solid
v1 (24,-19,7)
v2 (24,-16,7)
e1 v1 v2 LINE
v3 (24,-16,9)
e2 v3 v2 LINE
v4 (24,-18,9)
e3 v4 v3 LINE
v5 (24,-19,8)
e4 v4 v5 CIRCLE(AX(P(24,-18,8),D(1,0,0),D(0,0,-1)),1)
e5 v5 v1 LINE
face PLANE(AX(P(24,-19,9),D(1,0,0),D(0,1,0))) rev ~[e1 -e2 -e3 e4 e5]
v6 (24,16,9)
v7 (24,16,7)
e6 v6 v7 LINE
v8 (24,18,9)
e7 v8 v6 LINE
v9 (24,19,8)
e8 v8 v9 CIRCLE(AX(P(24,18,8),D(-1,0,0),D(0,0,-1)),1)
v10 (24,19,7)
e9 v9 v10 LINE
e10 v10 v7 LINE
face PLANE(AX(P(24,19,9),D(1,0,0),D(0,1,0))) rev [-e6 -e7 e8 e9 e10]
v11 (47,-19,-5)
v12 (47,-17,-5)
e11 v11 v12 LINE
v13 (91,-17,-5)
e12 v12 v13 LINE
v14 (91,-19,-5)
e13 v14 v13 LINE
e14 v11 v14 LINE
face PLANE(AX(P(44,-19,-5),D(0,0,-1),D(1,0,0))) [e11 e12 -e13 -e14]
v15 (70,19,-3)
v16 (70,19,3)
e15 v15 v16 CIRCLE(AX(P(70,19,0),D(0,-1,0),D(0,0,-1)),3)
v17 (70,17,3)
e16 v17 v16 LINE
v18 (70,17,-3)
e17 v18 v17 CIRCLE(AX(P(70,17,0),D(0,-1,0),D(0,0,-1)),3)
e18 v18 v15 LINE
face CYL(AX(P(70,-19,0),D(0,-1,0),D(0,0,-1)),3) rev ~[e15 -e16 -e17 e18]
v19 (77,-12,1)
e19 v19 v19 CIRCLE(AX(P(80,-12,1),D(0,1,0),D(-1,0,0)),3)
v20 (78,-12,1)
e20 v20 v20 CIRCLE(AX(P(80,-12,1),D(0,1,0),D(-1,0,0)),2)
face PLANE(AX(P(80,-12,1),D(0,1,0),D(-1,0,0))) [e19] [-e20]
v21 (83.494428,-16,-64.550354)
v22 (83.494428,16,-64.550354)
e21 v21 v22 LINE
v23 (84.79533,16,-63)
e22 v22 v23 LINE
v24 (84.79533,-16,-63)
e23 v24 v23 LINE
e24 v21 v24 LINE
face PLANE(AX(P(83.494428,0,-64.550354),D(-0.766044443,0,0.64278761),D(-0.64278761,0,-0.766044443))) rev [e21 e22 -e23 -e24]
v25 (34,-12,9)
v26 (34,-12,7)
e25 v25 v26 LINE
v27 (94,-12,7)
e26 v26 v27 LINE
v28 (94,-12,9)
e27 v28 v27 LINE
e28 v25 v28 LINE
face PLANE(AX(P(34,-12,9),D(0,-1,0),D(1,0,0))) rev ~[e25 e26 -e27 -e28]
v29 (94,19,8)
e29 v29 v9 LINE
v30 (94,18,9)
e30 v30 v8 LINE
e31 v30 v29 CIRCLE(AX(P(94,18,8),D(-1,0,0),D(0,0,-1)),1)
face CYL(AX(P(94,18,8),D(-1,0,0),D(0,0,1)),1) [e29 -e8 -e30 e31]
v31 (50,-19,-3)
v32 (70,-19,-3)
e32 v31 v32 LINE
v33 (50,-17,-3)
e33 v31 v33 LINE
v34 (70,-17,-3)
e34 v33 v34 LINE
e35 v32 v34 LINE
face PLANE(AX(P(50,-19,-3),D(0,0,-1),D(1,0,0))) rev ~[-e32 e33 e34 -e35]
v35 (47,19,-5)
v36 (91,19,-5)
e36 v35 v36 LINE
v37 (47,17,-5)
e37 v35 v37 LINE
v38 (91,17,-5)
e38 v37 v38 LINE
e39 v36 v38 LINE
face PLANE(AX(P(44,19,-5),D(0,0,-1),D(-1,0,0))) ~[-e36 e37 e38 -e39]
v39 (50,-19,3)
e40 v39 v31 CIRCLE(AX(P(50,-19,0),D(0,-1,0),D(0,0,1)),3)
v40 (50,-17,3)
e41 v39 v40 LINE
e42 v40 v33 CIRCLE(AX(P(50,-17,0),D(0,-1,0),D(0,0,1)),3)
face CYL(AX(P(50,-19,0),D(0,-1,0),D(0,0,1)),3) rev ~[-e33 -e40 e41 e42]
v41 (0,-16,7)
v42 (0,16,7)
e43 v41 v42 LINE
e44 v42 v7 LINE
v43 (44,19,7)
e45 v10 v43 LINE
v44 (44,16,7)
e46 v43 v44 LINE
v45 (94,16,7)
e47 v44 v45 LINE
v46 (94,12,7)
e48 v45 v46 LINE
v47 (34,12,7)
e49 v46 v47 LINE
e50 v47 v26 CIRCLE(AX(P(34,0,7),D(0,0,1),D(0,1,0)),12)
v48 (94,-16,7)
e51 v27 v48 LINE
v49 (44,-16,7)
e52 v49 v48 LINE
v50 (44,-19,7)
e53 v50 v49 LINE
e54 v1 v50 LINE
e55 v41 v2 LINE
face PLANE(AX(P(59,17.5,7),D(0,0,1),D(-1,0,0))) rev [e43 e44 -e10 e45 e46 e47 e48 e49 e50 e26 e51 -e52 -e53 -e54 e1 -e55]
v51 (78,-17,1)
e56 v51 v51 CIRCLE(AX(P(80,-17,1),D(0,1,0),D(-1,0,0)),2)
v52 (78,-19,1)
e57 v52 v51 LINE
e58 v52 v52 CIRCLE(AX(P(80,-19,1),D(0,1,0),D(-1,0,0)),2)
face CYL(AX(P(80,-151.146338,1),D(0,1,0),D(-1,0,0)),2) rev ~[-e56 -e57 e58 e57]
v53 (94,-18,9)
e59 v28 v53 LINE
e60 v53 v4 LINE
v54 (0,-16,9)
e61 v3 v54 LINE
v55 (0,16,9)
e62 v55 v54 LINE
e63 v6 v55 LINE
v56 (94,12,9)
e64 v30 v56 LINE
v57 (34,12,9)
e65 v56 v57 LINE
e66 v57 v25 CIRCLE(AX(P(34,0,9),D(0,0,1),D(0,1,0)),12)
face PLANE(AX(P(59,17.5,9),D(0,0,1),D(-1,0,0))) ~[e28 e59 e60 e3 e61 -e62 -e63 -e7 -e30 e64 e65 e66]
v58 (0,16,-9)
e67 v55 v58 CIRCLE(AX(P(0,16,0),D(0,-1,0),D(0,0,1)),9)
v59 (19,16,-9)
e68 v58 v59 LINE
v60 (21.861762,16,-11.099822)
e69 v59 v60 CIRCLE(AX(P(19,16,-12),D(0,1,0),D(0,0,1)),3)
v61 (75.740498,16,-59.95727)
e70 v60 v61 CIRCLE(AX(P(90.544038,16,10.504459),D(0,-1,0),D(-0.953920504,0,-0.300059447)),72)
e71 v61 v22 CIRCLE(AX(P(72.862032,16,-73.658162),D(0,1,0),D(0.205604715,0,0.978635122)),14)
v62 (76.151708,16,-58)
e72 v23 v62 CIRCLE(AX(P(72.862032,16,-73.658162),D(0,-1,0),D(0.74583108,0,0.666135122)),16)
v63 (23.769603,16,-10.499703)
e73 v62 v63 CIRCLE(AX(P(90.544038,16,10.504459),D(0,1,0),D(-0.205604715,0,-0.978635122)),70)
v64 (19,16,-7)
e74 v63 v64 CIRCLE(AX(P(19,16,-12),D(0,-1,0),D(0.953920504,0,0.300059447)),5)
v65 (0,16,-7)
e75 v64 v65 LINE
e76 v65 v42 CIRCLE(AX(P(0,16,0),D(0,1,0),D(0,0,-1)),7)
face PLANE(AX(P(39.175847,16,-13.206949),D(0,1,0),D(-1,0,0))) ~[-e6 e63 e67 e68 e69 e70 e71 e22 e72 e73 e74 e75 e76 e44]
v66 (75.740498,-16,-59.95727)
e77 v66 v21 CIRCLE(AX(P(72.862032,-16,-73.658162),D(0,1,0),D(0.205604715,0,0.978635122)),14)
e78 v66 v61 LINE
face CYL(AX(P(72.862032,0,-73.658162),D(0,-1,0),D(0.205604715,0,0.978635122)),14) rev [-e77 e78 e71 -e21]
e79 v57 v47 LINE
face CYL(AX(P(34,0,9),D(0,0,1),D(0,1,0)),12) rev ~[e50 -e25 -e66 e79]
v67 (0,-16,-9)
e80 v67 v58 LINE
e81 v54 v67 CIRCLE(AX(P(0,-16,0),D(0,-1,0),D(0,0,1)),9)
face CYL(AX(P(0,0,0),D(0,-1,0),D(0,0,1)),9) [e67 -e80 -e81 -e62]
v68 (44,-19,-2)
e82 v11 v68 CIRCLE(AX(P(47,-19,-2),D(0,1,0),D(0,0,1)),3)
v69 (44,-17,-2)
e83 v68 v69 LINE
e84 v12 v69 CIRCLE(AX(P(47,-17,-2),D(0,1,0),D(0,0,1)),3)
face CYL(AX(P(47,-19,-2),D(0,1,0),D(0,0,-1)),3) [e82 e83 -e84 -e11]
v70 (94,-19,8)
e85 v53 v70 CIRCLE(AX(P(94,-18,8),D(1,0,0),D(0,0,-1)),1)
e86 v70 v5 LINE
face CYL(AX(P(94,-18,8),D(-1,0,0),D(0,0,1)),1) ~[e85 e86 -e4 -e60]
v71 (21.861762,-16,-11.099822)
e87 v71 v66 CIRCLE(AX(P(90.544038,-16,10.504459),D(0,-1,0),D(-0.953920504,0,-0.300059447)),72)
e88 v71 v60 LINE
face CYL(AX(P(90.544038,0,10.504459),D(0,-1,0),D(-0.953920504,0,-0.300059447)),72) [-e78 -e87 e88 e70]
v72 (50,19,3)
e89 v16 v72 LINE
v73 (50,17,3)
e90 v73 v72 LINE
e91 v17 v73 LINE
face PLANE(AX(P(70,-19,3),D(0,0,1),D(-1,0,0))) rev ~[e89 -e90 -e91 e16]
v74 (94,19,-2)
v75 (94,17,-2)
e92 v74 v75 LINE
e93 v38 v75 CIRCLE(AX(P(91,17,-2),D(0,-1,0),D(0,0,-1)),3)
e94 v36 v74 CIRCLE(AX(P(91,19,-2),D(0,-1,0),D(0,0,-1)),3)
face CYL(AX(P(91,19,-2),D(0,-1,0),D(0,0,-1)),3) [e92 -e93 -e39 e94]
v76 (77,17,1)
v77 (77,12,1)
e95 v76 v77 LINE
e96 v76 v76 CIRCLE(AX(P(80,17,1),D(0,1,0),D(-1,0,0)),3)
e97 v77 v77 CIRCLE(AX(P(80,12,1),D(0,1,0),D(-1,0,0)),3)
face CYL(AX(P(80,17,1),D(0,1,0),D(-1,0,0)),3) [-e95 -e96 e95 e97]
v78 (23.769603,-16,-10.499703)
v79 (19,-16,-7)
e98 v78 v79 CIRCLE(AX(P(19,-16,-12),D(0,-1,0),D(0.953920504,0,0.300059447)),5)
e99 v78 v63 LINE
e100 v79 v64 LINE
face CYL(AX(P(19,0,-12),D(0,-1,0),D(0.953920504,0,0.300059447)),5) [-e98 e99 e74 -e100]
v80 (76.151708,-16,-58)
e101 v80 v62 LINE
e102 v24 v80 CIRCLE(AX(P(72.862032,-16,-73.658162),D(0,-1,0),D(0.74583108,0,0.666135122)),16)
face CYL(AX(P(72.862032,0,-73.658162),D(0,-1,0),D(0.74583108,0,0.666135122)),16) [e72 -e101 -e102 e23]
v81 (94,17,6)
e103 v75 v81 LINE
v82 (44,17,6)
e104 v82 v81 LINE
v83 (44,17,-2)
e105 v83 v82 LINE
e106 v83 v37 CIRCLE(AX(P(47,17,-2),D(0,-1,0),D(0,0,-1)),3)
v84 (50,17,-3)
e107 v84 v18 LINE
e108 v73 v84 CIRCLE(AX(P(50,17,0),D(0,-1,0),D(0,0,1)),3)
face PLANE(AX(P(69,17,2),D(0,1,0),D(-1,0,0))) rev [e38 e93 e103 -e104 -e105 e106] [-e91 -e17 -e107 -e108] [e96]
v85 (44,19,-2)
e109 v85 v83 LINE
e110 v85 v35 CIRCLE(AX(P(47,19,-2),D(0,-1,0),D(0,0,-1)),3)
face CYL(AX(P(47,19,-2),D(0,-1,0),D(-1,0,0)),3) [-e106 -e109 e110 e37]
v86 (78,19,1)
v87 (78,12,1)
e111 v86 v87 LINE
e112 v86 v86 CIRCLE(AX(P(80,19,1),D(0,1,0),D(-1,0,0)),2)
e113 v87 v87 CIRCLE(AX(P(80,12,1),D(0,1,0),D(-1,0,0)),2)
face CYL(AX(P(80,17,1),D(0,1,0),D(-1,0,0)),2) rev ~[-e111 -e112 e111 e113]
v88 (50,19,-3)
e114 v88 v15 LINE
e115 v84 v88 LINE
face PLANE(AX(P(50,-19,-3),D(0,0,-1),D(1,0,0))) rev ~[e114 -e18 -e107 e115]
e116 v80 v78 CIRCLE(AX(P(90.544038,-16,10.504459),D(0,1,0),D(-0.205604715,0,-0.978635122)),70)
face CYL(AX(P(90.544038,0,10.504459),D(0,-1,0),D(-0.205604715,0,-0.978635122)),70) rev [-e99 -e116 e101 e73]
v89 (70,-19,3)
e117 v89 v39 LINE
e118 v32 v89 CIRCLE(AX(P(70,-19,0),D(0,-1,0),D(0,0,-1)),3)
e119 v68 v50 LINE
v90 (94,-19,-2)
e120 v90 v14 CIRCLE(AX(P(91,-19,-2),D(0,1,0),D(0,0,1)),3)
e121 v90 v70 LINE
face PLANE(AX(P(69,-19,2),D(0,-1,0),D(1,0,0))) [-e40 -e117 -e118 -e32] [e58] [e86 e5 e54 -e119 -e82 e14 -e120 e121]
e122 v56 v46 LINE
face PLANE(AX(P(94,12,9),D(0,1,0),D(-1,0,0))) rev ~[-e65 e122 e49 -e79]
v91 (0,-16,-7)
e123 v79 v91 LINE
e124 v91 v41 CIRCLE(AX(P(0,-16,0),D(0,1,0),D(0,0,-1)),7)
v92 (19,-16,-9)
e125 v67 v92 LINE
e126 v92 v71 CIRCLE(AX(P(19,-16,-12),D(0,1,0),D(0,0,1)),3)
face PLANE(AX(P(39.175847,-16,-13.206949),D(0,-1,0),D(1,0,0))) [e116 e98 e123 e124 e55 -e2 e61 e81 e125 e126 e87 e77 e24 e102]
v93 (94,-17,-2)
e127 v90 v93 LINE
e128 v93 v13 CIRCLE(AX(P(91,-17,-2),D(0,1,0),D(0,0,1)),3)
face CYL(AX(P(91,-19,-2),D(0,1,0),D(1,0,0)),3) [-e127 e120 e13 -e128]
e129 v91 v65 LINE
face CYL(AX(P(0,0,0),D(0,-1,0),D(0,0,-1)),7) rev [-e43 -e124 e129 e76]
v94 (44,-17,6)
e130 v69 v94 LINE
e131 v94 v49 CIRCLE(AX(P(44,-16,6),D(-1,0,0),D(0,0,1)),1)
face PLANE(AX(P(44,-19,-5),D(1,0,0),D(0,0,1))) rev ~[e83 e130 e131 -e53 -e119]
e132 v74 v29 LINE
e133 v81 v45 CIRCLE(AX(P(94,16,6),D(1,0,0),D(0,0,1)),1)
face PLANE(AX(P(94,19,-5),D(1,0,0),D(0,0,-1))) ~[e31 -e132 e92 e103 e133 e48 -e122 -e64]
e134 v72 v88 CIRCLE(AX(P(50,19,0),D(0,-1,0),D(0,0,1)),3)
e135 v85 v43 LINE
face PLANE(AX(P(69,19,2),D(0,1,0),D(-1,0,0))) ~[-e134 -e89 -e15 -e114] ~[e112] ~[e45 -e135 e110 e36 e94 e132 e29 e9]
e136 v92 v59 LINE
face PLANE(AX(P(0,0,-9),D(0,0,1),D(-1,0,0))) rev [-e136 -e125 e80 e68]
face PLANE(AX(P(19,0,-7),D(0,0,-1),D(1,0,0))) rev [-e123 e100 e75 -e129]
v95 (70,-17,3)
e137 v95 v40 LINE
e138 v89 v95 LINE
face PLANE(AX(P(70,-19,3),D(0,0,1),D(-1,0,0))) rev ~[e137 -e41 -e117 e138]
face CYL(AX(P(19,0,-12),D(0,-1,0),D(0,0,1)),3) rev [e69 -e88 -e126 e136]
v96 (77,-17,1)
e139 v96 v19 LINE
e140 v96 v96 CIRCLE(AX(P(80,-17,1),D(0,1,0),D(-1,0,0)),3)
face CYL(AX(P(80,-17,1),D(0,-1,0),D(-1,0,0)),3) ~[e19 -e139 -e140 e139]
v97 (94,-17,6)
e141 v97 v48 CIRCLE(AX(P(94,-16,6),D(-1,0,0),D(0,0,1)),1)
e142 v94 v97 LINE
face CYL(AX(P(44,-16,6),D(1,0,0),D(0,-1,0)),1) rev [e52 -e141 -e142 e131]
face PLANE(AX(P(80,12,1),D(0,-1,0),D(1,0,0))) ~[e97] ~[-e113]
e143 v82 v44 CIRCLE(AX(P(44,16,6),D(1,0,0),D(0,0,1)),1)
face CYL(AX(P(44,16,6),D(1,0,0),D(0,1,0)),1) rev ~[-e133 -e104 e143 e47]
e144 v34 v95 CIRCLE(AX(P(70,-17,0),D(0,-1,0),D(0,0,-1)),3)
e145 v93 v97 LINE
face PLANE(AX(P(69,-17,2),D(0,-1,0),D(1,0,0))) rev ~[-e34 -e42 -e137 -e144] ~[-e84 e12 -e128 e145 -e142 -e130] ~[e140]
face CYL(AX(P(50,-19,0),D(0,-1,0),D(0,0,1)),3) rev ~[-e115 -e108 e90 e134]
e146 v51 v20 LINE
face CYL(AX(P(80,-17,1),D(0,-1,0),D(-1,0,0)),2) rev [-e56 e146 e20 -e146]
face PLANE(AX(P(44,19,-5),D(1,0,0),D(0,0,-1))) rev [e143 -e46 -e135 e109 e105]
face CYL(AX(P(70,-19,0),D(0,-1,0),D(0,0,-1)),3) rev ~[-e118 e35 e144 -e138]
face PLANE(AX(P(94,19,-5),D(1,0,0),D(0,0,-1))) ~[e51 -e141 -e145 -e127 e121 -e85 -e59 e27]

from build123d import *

# Parameters (mm, degrees)
F1_DEPTH  = 16
F2_W      = 70
F2_H      = 3
F3_DEPTH  = 2
F4_W      = 50
F4_H      = 14
F5_DEPTH  = 2
F6_R      = 1
F9_DEPTH  = 2
F11_DEPTH = 38.001
F13_D     = 4
F14_R     = 3
F14_R_2   = 2
F15_DEPTH = 5
F16_R     = 3


# Not quite as in the source:
# - a pattern or mirror of a feature is missing from the dataset's text; its kind, count and spacing are read off the source's solid


with BuildPart() as f1:
    # F0 (on Front) → F1 (new body)
    with BuildSketch(Plane.XZ):
        with BuildLine():
            Line((94, 9), (0, 9))
            ThreePointArc((0, 9), (-9, 0), (0, -9))
            Line((0, -9), (19, -9))
            ThreePointArc((19, -9), (20.7747485708, -9.5812673752), (21.8617615127, -11.0998216597))
            ThreePointArc((21.8617615127, -11.0998216597), (42.1784205856, -42.831899352), (75.7404983282, -59.9572702431))
            ThreePointArc((75.7404983282, -59.9572702431), (79.997153255, -61.6128288571), (83.4944279816, -64.5503541724))
            Line((83.4944279816, -64.5503541724), (84.7953295958, -63))
            ThreePointArc((84.7953295958, -63), (80.8735692863, -59.8084227638), (76.1517077584, -58))
            ThreePointArc((76.1517077584, -58), (43.5219099532, -41.3503338559), (23.7696025212, -10.4997027661))
            ThreePointArc((23.7696025212, -10.4997027661), (21.9579142847, -7.9687789586), (19, -7))
            Line((19, -7), (0, -7))
            ThreePointArc((0, -7), (-7, 0), (0, 7))
            Line((0, 7), (94, 7))
            Line((94, 7), (94, 9))
        make_face()
    extrude(amount=F1_DEPTH)

    # F2 (on face) → F3 (join)
    with BuildSketch(Plane.XY.offset(9)):
        with Locations((59, -17.5)):
            Rectangle(F2_W, F2_H)
    extrude(amount=-F3_DEPTH)

    # F4 (on face) → F5 (join)
    with BuildSketch(Plane.XZ.offset(19)):
        with Locations((69, 2)):
            Rectangle(F4_W, F4_H)
    extrude(amount=-F5_DEPTH)

    # F6
    f6_edges = [f1.edges().sort_by_distance(p)[0] for p in [
        (59, -19, 9),
        (69, -17, 7),
    ]]
    fillet(f6_edges, radius=F6_R)

    # F7: F1 across plane


with BuildPart() as f1_1:
    add(f1.part)
    add(f1.part.mirror(Plane.XZ))

    # F8 (on face) → F9 (cut)
    with BuildSketch(Plane.XY.offset(9)):
        with BuildLine():
            Line((94, 12), (34, 12))
            ThreePointArc((34, 12), (22, 0), (34, -12))
            Line((34, -12), (94, -12))
            Line((94, -12), (94, 12))
        make_face()
    extrude(amount=-F9_DEPTH, mode=Mode.SUBTRACT)

    # F10 (on face) → F11 (cut, through all)
    with BuildSketch(Plane.XZ.offset(19)):
        with BuildLine():
            ThreePointArc((50, 3), (47, 0), (50, -3))
            Line((50, -3), (70, -3))
            ThreePointArc((70, -3), (73, 0), (70, 3))
            Line((70, 3), (50, 3))
        make_face()
    extrude(amount=-F11_DEPTH, mode=Mode.SUBTRACT)

    # F13 (through all)
    with Locations(Plane.XZ.offset(19)):
        with Locations((80, 1)):
            Hole(F13_D / 2)

    # F14 (on face) → F15 (join)
    with BuildSketch(Plane(origin=(0, -17, 0), x_dir=(-1, 0, 0), z_dir=(0, 1, 0))):
        with Locations((-80, 1)):
            Circle(F14_R)
        with Locations((-80, 1)):
            Circle(F14_R_2, mode=Mode.SUBTRACT)
    f15 = extrude(amount=F15_DEPTH)

    # F15_copies: F15 across plane
    add(f15.mirror(Plane.ZX))

    # F16
    f16_edges = [f1_1.edges().sort_by_distance(p)[0] for p in [
        (94, -18, -5),
        (94, 18, -5),
        (44, 18, -5),
        (44, -18, -5),
    ]]
    fillet(f16_edges, radius=F16_R)


solid = f1_1.part
